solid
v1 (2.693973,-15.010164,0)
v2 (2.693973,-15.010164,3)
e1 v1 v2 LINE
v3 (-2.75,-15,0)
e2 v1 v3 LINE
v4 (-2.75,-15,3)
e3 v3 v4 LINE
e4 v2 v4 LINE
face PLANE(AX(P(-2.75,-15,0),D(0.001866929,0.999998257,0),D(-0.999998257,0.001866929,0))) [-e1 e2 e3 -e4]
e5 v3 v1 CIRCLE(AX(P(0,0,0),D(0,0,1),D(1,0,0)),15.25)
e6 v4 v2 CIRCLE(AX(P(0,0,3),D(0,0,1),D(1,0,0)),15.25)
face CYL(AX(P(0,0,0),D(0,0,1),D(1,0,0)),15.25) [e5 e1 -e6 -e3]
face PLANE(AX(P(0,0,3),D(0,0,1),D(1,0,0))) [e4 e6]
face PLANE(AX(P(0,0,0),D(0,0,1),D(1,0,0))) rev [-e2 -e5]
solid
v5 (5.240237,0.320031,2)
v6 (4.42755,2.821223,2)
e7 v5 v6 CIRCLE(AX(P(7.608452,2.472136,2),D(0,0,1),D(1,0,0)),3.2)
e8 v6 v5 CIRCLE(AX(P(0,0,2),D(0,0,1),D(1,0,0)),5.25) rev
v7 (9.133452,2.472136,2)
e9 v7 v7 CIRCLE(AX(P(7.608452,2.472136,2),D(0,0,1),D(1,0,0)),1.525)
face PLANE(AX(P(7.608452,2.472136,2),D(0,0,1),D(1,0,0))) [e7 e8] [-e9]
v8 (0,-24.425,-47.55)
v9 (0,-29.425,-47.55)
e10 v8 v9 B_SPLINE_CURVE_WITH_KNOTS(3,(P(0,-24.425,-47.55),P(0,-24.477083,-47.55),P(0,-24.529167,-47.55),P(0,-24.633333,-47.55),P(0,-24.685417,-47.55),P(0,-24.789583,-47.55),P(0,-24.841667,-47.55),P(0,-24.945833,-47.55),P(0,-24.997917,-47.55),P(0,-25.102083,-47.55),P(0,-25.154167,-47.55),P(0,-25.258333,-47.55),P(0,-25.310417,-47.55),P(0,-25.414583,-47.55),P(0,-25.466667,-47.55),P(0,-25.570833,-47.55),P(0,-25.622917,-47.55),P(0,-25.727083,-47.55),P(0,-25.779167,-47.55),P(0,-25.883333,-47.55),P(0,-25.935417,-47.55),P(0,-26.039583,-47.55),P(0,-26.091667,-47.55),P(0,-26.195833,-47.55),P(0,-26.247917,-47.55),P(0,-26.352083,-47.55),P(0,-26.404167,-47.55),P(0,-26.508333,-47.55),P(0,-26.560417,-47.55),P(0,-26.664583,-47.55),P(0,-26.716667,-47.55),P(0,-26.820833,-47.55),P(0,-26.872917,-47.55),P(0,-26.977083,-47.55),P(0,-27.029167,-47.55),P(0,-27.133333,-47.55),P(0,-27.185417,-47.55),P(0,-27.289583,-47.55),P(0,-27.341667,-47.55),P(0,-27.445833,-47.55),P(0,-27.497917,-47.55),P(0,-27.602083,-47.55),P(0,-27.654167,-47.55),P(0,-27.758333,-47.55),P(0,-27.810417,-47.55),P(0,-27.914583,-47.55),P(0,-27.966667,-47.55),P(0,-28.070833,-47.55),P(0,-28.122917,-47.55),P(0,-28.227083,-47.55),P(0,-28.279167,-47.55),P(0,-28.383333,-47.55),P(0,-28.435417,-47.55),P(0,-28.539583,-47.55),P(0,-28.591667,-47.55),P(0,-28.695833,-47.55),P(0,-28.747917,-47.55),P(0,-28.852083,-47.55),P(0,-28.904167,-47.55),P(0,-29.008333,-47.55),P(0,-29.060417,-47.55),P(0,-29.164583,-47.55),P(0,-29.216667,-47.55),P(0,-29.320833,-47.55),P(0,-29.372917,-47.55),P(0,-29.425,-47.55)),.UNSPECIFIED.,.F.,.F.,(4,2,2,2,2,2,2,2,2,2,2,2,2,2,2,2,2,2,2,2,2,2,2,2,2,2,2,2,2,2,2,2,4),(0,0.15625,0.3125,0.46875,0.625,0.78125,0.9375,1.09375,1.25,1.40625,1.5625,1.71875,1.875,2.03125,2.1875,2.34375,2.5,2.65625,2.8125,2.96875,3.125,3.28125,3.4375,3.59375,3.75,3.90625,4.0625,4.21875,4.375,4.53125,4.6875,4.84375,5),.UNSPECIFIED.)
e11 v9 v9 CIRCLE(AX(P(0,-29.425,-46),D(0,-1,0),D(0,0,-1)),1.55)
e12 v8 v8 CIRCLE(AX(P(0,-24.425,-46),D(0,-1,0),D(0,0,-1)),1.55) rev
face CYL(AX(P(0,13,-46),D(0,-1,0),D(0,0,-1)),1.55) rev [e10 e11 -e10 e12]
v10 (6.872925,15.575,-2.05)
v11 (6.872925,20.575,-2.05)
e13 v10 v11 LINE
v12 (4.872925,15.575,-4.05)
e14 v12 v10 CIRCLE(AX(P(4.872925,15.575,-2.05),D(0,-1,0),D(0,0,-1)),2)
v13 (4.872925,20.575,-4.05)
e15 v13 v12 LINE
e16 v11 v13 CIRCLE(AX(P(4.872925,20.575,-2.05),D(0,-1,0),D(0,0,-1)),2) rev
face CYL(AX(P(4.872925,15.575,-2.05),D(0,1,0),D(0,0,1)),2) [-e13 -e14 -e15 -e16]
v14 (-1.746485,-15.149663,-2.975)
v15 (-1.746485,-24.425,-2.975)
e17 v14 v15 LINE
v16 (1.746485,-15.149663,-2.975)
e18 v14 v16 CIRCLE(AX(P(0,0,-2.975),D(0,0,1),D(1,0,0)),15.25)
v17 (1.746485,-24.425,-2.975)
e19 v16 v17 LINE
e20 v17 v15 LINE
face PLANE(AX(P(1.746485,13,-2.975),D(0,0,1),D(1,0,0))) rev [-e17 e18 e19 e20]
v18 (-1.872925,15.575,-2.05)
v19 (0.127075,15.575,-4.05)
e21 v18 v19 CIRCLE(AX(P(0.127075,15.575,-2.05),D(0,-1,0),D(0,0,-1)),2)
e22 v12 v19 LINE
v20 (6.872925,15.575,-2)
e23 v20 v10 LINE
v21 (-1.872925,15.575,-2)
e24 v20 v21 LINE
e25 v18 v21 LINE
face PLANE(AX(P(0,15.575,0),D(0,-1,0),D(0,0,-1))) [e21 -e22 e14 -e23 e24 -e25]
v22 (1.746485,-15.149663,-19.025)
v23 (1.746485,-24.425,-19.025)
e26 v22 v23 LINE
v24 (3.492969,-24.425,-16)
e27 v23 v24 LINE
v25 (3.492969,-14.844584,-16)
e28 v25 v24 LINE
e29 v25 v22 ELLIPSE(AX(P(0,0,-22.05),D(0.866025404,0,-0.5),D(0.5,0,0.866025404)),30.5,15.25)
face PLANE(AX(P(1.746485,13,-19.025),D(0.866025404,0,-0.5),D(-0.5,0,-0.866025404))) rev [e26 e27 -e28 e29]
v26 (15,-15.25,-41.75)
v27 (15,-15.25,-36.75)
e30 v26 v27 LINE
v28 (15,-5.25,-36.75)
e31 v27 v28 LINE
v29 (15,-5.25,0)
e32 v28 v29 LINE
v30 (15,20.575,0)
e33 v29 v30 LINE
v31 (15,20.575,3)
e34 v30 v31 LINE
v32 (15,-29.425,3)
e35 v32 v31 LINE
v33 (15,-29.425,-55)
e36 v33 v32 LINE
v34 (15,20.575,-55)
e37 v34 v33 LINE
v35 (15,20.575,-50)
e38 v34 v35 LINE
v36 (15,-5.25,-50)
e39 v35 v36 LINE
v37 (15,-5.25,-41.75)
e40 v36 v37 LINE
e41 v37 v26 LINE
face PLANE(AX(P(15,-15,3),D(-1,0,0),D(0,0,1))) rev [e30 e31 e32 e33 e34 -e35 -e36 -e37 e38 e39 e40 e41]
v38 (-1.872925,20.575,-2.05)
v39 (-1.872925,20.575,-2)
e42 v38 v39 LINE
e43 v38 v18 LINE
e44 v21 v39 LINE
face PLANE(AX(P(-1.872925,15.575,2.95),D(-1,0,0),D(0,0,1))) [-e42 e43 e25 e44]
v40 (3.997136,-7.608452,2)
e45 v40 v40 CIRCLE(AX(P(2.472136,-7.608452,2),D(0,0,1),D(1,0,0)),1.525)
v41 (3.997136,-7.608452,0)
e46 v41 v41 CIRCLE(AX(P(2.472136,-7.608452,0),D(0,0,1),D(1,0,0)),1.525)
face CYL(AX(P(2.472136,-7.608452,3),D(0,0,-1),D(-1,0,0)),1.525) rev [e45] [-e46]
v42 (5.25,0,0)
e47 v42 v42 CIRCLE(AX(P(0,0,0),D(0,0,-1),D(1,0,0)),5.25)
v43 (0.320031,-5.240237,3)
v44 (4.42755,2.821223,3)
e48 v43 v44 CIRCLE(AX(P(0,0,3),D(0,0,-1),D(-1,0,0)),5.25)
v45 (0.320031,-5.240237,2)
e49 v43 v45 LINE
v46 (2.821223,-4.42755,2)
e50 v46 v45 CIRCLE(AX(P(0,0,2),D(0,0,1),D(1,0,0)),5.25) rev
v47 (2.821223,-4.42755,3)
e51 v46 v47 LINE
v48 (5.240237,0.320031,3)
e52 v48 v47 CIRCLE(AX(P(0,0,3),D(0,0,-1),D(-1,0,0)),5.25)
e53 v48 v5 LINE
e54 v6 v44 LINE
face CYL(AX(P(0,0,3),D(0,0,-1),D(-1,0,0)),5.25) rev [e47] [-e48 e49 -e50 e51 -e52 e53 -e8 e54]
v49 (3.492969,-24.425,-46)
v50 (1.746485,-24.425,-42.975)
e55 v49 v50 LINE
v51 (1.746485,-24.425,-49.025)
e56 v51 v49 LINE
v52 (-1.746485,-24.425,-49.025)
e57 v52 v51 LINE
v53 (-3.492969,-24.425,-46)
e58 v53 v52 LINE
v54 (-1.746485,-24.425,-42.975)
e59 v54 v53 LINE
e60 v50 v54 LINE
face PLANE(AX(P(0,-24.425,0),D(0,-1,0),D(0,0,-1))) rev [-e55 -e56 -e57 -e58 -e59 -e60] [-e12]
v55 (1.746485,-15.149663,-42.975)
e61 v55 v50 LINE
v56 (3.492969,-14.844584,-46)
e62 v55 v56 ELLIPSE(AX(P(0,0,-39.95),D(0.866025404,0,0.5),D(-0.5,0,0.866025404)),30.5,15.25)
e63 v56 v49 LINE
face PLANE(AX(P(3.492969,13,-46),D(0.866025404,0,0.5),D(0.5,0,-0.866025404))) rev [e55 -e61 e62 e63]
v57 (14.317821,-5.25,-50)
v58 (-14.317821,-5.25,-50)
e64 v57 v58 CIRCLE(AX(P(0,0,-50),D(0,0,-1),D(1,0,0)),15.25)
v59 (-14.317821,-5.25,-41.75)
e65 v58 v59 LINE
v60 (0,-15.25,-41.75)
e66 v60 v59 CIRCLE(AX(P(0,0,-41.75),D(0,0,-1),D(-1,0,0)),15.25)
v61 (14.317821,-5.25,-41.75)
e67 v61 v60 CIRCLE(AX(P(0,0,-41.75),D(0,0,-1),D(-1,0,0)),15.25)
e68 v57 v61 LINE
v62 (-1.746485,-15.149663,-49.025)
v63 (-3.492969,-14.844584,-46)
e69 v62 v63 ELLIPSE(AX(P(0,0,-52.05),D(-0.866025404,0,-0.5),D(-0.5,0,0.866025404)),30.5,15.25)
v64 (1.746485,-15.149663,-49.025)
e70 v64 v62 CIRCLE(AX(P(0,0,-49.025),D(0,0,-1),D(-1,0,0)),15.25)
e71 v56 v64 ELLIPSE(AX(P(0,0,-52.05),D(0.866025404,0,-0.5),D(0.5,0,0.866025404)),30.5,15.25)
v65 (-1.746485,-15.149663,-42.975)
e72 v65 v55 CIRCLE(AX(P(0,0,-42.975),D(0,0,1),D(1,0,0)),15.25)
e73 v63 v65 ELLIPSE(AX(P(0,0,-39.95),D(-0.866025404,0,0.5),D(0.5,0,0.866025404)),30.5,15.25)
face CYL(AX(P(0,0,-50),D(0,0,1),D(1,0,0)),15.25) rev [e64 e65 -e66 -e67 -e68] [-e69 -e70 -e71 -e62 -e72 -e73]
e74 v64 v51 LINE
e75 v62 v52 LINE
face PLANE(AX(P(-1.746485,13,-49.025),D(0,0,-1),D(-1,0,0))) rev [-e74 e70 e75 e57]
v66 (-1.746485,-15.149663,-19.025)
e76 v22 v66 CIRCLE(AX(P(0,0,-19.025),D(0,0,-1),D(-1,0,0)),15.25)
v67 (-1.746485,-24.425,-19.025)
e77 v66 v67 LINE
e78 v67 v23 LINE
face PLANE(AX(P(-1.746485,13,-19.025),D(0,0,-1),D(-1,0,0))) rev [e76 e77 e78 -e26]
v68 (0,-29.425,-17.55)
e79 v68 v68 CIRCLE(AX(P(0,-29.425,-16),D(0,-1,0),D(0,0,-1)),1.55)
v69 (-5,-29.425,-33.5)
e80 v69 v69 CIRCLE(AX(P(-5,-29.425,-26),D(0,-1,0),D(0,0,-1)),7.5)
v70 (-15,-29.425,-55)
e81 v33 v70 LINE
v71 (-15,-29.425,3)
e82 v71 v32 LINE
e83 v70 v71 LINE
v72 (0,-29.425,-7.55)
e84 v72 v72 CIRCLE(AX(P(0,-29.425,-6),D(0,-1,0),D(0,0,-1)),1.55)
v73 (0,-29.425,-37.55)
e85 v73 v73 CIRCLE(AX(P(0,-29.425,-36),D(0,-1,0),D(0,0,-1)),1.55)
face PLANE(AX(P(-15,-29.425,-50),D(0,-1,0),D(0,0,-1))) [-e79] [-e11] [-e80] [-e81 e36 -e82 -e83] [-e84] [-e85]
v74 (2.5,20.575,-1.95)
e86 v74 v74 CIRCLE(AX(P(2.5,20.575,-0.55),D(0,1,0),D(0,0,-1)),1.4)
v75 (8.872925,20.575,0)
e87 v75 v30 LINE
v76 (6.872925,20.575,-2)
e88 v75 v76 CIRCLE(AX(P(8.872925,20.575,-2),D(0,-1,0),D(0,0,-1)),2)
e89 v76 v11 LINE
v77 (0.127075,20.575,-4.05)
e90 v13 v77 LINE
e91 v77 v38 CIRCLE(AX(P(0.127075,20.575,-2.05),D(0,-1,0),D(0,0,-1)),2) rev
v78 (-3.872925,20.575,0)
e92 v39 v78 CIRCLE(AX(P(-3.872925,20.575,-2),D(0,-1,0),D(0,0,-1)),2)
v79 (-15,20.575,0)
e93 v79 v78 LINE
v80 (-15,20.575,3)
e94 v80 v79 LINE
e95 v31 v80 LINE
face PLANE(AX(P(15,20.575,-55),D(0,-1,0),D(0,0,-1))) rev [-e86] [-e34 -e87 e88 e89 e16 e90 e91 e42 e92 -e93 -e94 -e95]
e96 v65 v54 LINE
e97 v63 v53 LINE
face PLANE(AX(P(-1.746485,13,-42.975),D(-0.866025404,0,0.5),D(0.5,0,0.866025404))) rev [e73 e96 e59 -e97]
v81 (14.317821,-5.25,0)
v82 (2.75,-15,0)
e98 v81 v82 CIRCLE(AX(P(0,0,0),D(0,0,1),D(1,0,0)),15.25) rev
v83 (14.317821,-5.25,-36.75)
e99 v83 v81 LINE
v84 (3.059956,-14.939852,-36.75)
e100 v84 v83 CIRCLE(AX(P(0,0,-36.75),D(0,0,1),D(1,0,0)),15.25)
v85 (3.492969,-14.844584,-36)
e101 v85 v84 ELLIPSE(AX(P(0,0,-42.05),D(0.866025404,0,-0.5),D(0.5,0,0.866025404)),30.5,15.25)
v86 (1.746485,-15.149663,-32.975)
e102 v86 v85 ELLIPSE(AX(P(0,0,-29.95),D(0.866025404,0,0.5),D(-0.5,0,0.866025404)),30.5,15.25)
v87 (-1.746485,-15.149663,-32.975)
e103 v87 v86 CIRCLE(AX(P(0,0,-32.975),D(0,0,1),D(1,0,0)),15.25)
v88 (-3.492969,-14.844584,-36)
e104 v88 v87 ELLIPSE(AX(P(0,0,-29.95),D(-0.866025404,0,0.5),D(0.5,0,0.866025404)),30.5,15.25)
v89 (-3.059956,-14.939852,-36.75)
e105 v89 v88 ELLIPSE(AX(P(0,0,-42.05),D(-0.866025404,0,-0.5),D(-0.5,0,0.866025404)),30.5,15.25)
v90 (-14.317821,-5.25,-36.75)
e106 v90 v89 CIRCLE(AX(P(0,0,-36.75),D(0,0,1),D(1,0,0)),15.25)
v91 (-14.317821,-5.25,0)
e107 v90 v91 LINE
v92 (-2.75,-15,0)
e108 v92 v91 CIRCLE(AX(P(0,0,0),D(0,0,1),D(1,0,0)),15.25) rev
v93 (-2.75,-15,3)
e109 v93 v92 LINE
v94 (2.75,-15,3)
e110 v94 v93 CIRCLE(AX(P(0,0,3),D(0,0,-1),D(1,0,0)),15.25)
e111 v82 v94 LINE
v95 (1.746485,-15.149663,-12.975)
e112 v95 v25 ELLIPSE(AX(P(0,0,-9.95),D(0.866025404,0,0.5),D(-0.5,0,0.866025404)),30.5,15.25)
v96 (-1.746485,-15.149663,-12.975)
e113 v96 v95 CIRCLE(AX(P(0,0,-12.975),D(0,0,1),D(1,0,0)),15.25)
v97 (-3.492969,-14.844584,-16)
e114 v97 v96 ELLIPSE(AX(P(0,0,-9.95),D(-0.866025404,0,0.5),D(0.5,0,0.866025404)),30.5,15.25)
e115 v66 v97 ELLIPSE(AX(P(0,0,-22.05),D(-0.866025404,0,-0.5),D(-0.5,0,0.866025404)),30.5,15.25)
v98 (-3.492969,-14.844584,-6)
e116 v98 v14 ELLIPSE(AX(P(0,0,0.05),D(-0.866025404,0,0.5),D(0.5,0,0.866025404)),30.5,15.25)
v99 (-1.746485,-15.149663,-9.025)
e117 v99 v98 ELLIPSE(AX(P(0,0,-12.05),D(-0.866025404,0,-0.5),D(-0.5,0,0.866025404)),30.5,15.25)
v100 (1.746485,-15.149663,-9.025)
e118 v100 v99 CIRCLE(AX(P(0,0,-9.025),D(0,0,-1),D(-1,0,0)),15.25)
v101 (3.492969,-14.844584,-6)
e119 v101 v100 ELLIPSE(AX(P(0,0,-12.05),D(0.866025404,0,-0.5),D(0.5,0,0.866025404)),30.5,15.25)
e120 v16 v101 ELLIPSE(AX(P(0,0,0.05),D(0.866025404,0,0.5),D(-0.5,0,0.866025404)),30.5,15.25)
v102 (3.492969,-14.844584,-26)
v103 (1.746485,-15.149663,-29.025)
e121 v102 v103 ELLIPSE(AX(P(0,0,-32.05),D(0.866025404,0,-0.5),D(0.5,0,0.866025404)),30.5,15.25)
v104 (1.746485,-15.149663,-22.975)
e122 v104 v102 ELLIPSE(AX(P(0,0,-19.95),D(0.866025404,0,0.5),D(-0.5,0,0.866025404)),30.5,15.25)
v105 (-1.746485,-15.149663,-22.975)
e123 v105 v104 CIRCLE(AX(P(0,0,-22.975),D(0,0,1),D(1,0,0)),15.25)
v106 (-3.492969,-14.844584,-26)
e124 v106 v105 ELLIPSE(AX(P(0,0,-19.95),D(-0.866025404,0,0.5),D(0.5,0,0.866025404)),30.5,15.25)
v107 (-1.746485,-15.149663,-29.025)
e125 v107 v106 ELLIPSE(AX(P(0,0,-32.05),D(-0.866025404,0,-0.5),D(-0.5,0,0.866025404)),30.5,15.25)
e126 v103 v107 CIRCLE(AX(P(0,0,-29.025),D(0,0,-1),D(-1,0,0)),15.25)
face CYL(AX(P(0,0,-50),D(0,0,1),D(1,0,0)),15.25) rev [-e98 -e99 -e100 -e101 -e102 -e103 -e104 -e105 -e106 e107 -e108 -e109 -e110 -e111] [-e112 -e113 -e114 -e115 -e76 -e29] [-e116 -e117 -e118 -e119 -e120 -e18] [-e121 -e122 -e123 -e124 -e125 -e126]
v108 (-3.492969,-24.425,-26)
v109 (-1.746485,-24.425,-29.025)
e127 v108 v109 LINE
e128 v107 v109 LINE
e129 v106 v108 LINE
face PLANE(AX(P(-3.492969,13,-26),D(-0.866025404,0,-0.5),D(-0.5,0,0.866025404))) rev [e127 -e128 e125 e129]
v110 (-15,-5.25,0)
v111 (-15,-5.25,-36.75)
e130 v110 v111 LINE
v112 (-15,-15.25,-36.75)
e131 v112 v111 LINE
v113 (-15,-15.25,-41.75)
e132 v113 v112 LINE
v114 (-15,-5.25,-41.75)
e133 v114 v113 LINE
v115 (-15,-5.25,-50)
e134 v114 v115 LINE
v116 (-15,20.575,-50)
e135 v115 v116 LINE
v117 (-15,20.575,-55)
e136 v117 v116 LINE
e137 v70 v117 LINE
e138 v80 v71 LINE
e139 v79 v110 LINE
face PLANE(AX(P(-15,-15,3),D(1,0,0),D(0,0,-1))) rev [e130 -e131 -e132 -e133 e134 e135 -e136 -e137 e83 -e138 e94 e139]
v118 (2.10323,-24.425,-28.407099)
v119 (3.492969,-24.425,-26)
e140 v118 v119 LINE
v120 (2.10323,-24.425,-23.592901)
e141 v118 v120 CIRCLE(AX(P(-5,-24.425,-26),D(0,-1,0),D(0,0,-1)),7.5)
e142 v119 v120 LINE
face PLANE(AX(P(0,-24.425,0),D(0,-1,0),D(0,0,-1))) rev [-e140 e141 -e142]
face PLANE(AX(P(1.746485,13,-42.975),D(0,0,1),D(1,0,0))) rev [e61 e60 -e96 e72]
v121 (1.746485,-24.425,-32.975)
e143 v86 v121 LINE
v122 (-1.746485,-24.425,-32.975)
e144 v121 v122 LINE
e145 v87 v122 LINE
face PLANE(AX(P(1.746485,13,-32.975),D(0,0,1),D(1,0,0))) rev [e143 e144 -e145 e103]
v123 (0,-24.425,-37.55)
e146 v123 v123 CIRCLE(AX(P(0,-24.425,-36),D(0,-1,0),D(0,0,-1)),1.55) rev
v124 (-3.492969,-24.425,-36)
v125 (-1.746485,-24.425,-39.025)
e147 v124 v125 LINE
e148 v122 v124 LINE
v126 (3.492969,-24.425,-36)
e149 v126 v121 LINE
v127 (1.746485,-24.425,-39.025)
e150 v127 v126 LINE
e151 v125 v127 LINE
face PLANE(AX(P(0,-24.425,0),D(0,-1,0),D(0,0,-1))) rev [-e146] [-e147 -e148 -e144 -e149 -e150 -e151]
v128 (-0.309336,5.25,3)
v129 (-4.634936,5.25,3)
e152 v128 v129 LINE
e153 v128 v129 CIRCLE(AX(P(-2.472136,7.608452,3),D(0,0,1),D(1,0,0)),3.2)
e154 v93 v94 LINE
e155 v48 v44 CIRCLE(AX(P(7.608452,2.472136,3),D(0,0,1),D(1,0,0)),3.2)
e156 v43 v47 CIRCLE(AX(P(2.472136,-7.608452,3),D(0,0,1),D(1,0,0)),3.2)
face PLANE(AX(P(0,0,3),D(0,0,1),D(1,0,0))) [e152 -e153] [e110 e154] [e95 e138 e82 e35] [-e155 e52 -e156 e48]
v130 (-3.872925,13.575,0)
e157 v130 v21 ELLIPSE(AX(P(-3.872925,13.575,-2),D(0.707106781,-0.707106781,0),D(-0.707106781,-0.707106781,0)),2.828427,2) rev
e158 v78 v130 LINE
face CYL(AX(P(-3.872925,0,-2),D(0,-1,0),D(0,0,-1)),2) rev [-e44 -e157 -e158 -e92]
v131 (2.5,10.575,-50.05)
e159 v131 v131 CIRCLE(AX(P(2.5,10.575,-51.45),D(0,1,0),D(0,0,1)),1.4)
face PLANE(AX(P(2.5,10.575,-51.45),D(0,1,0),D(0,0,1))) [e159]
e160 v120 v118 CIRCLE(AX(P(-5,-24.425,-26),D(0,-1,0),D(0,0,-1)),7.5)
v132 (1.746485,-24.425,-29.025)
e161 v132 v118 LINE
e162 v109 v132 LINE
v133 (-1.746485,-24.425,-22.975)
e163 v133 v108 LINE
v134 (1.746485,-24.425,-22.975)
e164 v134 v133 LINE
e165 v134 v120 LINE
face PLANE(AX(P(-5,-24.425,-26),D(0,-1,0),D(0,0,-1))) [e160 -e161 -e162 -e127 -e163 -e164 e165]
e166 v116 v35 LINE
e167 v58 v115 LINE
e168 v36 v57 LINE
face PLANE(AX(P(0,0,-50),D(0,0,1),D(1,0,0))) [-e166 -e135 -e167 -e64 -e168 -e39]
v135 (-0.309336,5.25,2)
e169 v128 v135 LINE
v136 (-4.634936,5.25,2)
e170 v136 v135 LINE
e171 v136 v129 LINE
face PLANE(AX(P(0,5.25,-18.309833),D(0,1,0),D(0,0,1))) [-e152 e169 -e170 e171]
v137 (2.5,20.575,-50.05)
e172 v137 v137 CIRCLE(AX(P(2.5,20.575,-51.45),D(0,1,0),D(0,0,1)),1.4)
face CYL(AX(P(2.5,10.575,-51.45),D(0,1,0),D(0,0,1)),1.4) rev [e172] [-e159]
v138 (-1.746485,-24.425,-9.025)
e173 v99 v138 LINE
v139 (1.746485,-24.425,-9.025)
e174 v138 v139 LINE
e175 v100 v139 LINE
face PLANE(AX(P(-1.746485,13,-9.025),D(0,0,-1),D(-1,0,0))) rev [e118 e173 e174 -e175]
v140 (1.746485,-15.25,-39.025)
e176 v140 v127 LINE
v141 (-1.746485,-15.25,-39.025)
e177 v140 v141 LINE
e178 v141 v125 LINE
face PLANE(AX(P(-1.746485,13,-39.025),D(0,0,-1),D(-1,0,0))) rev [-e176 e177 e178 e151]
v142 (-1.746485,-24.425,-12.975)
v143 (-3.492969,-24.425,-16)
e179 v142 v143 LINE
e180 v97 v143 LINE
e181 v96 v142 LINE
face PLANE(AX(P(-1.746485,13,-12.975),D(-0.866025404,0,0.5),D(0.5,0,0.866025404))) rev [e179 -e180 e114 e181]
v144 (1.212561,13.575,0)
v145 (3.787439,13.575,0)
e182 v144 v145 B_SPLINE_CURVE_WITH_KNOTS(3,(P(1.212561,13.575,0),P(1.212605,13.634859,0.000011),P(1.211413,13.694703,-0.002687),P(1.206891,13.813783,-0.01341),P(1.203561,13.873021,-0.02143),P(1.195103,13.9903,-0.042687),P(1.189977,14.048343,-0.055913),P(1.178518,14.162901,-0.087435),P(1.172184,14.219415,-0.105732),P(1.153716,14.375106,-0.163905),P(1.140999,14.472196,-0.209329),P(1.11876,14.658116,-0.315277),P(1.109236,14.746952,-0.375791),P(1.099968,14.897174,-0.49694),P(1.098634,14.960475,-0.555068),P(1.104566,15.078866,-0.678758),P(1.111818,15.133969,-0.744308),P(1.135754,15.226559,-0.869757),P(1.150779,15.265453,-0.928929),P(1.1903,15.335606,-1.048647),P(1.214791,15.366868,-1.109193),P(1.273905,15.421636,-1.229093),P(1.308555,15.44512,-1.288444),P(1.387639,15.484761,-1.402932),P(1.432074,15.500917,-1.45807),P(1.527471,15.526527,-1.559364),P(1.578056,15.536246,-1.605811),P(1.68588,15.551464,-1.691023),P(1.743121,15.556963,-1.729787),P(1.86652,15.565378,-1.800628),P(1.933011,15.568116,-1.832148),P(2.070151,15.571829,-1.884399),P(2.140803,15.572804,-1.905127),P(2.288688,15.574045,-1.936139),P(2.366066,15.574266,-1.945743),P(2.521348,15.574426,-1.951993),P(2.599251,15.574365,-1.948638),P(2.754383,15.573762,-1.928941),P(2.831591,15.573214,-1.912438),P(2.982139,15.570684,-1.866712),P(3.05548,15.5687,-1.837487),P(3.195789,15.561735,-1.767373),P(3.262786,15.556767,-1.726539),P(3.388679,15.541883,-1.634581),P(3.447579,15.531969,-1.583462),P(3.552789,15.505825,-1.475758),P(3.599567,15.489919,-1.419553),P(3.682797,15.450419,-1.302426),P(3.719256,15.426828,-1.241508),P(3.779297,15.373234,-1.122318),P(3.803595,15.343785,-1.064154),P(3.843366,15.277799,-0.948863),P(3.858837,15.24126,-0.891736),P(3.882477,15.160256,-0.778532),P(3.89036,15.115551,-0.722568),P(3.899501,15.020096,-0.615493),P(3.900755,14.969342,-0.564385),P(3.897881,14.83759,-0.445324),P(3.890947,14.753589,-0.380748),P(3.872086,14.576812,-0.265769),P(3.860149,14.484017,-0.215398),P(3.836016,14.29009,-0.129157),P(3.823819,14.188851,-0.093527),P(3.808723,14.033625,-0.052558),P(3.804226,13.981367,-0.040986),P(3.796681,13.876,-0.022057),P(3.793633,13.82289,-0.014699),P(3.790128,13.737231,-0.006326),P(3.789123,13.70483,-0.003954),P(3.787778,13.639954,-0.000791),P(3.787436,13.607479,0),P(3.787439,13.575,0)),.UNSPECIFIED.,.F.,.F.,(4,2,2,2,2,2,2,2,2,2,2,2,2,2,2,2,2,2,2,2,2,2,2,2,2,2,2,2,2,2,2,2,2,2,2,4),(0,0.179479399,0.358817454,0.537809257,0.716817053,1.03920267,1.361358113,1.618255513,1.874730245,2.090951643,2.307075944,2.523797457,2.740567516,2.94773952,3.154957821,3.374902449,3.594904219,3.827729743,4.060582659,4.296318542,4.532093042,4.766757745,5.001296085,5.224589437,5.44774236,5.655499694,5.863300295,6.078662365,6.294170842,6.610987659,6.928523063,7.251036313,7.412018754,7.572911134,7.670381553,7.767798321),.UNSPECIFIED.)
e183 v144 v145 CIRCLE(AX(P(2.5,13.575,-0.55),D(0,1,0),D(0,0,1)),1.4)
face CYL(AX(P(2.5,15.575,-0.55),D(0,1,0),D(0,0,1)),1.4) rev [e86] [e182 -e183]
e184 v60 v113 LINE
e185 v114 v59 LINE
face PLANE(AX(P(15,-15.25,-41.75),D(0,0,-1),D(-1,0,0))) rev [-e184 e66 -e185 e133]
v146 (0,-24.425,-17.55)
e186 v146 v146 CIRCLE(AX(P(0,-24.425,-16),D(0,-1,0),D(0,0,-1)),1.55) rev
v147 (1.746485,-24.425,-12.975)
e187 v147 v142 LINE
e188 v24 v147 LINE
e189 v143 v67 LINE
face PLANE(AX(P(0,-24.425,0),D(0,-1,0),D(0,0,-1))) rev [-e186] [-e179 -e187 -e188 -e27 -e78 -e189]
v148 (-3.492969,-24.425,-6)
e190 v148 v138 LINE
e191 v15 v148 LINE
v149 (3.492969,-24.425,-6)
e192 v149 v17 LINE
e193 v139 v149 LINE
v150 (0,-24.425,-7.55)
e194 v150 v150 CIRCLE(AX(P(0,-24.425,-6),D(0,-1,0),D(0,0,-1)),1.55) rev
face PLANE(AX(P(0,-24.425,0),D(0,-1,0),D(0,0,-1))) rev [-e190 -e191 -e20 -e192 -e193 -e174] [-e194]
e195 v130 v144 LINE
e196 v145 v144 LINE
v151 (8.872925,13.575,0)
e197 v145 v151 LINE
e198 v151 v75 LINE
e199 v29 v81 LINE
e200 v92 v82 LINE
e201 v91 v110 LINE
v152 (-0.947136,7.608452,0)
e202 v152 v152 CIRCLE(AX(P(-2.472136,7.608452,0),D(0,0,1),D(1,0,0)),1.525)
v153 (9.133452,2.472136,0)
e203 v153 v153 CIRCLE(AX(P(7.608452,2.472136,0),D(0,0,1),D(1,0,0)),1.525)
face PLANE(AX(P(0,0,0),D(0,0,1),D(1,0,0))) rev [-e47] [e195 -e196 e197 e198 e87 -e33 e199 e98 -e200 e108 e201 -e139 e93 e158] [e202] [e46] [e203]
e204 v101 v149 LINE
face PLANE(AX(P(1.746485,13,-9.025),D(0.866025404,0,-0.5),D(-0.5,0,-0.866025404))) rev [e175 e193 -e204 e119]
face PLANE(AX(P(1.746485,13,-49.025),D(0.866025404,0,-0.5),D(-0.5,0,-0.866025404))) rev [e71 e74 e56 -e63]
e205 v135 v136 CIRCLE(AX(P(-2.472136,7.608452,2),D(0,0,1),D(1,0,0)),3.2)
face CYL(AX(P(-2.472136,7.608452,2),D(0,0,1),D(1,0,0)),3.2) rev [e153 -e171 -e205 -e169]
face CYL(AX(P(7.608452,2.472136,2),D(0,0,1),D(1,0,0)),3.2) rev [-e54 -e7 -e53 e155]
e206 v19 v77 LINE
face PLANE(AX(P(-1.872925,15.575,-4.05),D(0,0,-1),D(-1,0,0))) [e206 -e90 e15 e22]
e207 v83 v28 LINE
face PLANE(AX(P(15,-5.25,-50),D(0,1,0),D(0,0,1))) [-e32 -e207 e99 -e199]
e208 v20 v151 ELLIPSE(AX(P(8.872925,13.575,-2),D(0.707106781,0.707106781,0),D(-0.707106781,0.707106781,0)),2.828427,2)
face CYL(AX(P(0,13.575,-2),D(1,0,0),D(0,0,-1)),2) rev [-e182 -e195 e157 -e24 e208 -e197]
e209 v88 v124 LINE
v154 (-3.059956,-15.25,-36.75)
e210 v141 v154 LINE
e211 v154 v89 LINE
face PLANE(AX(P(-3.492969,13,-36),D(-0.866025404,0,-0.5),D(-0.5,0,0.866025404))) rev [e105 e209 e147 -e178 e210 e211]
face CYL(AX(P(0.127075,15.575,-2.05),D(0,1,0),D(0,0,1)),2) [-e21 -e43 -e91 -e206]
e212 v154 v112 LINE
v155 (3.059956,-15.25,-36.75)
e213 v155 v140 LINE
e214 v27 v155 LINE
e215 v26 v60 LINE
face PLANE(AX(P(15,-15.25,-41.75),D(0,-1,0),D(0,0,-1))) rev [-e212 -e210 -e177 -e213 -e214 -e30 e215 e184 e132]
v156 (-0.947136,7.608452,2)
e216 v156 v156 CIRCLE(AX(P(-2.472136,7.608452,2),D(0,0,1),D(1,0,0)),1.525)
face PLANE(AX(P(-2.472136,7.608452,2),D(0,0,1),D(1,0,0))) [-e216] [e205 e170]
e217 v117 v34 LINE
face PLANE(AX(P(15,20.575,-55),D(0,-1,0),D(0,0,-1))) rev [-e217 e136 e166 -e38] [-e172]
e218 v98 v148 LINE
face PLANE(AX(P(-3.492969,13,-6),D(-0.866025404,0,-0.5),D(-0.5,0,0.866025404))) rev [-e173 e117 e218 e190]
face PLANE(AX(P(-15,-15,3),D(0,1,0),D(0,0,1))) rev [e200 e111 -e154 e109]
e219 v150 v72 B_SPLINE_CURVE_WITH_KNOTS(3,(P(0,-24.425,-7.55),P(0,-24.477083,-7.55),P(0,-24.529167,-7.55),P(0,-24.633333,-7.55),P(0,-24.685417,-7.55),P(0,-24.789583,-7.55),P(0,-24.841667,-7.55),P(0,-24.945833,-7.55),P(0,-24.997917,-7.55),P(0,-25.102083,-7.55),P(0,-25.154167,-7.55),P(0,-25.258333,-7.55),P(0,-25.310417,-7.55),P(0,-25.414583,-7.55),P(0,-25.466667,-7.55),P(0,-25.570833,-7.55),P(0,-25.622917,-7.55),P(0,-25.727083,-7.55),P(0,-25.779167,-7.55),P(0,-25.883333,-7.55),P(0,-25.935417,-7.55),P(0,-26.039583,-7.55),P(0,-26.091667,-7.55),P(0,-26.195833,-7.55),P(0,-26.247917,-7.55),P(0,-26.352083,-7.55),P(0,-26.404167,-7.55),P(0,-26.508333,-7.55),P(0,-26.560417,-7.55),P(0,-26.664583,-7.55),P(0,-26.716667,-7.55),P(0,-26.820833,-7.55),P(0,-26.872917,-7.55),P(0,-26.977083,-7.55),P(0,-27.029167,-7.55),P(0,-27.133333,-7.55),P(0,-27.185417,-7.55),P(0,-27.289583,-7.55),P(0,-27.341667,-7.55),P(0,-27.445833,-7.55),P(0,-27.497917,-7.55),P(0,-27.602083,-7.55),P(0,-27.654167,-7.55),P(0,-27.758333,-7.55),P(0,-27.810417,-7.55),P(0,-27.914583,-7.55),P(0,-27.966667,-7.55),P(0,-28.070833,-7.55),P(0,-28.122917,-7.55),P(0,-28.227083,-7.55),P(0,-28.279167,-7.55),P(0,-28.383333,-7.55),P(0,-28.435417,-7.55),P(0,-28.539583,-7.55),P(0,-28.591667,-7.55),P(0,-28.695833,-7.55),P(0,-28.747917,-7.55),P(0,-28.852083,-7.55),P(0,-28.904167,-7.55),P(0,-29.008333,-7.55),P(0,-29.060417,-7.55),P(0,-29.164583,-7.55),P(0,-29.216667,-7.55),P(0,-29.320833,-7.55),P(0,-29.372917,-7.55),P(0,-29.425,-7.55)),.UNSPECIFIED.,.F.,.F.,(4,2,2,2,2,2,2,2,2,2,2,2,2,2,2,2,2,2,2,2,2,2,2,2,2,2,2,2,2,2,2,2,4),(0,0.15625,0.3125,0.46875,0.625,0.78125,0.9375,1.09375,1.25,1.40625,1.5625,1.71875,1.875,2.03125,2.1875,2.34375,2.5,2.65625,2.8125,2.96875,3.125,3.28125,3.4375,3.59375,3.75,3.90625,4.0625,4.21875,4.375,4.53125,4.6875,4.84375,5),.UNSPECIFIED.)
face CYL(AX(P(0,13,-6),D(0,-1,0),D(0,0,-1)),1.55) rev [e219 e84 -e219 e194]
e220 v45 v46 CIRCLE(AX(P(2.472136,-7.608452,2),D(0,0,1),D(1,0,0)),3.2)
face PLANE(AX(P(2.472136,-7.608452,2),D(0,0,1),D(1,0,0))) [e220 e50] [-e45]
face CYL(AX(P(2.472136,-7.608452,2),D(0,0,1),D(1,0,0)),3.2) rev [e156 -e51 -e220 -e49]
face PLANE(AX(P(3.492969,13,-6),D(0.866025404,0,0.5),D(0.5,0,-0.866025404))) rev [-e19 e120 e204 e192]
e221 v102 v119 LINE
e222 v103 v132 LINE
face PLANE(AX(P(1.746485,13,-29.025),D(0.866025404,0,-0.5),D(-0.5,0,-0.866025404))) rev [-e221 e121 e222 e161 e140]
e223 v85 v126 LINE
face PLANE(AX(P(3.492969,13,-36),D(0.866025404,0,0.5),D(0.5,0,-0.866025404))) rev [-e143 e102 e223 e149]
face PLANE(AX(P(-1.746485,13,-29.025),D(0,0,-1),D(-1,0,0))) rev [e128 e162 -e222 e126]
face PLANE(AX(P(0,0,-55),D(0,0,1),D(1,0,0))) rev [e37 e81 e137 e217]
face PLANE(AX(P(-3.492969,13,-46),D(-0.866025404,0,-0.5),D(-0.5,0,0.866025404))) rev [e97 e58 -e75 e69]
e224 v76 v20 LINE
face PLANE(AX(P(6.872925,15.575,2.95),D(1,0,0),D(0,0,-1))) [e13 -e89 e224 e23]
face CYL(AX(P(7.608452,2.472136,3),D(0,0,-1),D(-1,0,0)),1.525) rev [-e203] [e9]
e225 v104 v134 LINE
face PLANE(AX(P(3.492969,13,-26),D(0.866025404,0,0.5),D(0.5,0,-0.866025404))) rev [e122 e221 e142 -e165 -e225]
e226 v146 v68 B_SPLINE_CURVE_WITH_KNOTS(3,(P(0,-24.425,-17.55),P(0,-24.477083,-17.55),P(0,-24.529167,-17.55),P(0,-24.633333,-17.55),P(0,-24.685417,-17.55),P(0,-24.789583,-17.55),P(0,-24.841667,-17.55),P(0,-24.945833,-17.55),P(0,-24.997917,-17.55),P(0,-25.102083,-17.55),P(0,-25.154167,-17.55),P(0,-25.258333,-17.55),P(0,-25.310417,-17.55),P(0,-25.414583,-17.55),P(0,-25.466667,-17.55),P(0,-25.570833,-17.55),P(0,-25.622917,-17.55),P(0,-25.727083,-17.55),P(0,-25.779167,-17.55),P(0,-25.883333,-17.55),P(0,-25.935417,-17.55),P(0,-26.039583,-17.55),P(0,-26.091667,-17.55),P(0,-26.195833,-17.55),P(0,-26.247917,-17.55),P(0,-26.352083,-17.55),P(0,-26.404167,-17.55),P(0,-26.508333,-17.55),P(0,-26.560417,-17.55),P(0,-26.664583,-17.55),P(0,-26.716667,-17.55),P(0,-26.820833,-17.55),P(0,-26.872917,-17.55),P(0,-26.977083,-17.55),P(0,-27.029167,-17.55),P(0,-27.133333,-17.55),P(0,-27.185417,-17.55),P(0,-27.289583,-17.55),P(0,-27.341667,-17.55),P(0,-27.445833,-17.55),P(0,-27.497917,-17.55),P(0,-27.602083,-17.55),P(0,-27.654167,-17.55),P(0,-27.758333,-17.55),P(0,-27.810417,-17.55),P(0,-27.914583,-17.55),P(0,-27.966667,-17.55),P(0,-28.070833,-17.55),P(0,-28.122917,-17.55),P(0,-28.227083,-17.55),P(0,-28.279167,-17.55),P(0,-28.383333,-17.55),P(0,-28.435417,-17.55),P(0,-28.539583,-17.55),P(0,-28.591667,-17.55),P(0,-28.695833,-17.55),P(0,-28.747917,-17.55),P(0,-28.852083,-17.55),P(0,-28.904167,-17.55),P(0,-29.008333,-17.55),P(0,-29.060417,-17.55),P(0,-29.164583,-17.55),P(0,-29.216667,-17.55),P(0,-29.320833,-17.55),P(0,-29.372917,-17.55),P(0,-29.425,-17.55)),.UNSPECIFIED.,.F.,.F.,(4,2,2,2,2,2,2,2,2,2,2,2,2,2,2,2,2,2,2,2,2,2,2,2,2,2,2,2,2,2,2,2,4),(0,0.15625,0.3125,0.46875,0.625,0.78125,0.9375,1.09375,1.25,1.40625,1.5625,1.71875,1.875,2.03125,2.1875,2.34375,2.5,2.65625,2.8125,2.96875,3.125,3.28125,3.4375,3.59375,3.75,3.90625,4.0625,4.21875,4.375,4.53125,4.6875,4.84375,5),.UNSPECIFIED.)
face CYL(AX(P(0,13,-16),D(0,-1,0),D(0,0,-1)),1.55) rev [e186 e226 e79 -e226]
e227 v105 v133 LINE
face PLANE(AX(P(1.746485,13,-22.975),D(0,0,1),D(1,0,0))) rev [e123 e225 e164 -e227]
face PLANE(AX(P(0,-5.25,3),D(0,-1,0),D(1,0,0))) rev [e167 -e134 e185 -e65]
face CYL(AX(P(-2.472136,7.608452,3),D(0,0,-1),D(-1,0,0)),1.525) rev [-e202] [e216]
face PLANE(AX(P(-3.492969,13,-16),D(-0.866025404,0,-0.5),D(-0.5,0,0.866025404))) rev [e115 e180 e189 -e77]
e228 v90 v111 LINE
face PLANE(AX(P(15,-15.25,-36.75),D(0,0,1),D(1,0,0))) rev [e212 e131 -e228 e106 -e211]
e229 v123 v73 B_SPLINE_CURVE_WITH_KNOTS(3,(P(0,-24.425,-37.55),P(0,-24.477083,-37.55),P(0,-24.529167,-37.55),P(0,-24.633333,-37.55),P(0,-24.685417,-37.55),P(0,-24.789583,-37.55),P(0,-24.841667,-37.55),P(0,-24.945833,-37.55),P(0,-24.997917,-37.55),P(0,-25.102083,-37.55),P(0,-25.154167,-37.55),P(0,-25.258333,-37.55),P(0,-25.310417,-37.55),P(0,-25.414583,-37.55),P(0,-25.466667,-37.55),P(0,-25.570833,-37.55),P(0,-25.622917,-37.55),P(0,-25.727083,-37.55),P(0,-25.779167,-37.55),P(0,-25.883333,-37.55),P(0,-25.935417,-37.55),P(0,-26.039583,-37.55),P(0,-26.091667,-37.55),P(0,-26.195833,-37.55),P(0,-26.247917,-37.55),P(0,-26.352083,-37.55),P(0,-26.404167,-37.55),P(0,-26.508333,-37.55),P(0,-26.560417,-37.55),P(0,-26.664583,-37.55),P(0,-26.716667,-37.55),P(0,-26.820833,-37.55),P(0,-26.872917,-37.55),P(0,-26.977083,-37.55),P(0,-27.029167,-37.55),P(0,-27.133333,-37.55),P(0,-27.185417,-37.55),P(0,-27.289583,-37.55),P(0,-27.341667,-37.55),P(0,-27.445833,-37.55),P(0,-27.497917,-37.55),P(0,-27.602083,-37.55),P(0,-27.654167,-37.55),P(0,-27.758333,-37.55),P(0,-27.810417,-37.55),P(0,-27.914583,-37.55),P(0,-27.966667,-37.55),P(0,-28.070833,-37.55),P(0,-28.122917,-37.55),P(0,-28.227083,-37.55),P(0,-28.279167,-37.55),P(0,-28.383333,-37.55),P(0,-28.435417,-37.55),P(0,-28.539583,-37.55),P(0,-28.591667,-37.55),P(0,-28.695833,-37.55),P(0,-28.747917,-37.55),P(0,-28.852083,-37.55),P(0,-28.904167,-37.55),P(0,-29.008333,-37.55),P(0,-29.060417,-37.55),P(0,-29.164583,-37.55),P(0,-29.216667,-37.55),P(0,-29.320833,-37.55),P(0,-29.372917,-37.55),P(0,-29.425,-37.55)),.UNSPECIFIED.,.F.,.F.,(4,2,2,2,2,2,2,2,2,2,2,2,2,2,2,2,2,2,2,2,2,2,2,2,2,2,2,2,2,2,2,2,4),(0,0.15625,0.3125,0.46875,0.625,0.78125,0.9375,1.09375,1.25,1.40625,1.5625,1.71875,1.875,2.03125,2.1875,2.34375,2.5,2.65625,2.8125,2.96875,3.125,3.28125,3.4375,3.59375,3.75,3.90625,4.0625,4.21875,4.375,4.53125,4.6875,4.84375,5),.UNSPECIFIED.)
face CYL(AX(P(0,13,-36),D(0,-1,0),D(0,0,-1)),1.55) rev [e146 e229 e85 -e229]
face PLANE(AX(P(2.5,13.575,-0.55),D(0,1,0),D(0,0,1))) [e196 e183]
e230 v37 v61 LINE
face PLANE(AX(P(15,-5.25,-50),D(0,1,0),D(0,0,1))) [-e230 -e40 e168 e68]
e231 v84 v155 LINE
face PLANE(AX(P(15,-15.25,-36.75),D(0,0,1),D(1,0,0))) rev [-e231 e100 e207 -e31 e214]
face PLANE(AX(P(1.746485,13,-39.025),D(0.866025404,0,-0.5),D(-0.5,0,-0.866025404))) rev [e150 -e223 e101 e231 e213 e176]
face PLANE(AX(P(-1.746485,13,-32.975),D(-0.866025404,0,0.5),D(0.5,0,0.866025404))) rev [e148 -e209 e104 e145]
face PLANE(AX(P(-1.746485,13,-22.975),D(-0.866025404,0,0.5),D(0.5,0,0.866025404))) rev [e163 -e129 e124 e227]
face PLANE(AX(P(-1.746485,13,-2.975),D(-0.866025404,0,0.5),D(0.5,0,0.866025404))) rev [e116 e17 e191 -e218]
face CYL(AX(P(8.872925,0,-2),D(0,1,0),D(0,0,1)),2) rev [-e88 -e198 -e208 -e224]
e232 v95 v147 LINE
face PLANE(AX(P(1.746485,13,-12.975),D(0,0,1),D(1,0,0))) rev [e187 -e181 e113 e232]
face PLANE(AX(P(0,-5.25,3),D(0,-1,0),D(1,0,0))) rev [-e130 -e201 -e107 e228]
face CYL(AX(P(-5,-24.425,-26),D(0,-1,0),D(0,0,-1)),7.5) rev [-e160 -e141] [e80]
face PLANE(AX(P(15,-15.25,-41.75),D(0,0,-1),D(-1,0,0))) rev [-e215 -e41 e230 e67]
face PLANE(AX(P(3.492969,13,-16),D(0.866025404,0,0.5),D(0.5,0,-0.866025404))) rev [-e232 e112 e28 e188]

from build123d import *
from build123d.topology import SkipClean

# Parameters (mm, degrees)
SKETCH1_R           = 1.525
BOSS_EXTRUDE1_DEPTH = 3
BOSS_EXTRUDE2_DEPTH = 53
SKETCH3_R           = 1.55
CUT_EXTRUDE1_DEPTH  = 68.267232922
BOSS_EXTRUDE3_DEPTH = 3
CUT_EXTRUDE2_START  = -5
SKETCH5_R           = 1.55
CUT_EXTRUDE2_DEPTH  = 63.267232996
SKETCH6_R           = 3.2
CUT_EXTRUDE3_DEPTH  = 1
SKETCH7_W           = 30
SKETCH7_H           = 50
BOSS_EXTRUDE4_DEPTH = 5
SKETCH9_W           = 5
SKETCH9_H           = 20
CUT_EXTRUDE6_DEPTH  = 70.215826406
SKETCH10_R          = 7.5
CUT_EXTRUDE7_DEPTH  = 5
SKETCH12_R          = 1.4
CUT_EXTRUDE8_DEPTH  = 10
SKETCH13_W          = 30
SKETCH13_H          = 3
BOSS_EXTRUDE5_DEPTH = 7.575
BOSS_EXTRUDE6_START = -3
BOSS_EXTRUDE6_DEPTH = 3
SKETCH15_W          = 8.745849688
SKETCH15_H          = 7
SKETCH15_R          = 1.4
BOSS_EXTRUDE7_DEPTH = 5
SKETCH16_R          = 1.4
CUT_EXTRUDE9_DEPTH  = 7
FILLET1_R           = 2


with BuildPart() as part:
    # Sketch1 → Boss-Extrude1 (new body)
    with BuildSketch(Plane.XY):
        with BuildLine():
            Line((-15, -15), (15, -15))
            Line((15, -15), (15, 13))
            Line((15, 13), (-15, 13))
            Line((-15, 13), (-15, 5.25))
            Line((-15, 5.25), (0, 5.25))
            ThreePointArc((0, 5.25), (3.712310601, 3.712310601), (5.25, 0))
            ThreePointArc((5.25, 0), (3.712310601, -3.712310601), (0, -5.25))
            Line((0, -5.25), (-15, -5.25))
            Line((-15, -5.25), (-15, -15))
        make_face()
        with Locations((-2.472135955, 7.60845213)):
            Circle(SKETCH1_R, mode=Mode.SUBTRACT)
        with Locations((7.60845213, 2.472135955)):
            Circle(SKETCH1_R, mode=Mode.SUBTRACT)
        with Locations((2.472135955, -7.60845213)):
            Circle(SKETCH1_R, mode=Mode.SUBTRACT)
    extrude(amount=BOSS_EXTRUDE1_DEPTH)

    # Sketch2 → Boss-Extrude2 (add)
    with BuildSketch(Plane.XY.offset(3)):
        with BuildLine():
            Line((-15, -15), (-15, -5.25))
            Line((-15, -5.25), (-14.317821063, -5.25))
            ThreePointArc((-14.317821063, -5.25), (0, -15.25), (14.317821063, -5.25))
            Line((14.317821063, -5.25), (15, -5.25))
            Line((15, -5.25), (15, -15))
            Line((15, -15), (15, -29.425))
            Line((15, -29.425), (-15, -29.425))
            Line((-15, -29.425), (-15, -15))
        make_face()
    extrude(amount=-BOSS_EXTRUDE2_DEPTH)

    # Sketch3 → Cut-Extrude1 (cut, through all)
    with BuildSketch(Plane(origin=(0, -29.425, 0), x_dir=(-1, 0, 0), z_dir=(0, -1, 0))):
        with Locations(Location((0, 46, 0), (0, 0, 90))):
            Circle(SKETCH3_R)
        with Locations(Location((0, 36, 0), (0, 0, 90))):
            Circle(SKETCH3_R)
        with Locations(Location((0, 26, 0), (0, 0, 90))):
            Circle(SKETCH3_R)
        with Locations(Location((0, 16, 0), (0, 0, 90))):
            Circle(SKETCH3_R)
        with Locations(Location((0, 6, 0), (0, 0, 90))):
            Circle(SKETCH3_R)
    extrude(amount=-CUT_EXTRUDE1_DEPTH, mode=Mode.SUBTRACT)

    # Sketch5 → Cut-Extrude2 (cut, through all)
    # profile 1 of 5: a face of its own
    with BuildSketch(Plane(origin=(0, -29.425, 0), x_dir=(-1, 0, 0), z_dir=(0, -1, 0)).offset(CUT_EXTRUDE2_START)):
        Polygon((1.746484564, 32.975), (3.492969129, 36), (1.746484564, 39.025), (-1.746484564, 39.025), (-3.492969129, 36), (-1.746484564, 32.975), align=None)
        with Locations(Location((0, 36, 0), (0, 0, 90))):
            Circle(SKETCH5_R, mode=Mode.SUBTRACT)
    # profile 2 of 5: a face of its own
    with BuildSketch(Plane(origin=(0, -29.425, 0), x_dir=(-1, 0, 0), z_dir=(0, -1, 0)).offset(CUT_EXTRUDE2_START)):
        Polygon((1.746484564, 42.975), (3.492969129, 46), (1.746484564, 49.025), (-1.746484564, 49.025), (-3.492969129, 46), (-1.746484564, 42.975), align=None)
        with Locations(Location((0, 46, 0), (0, 0, 90))):
            Circle(SKETCH5_R, mode=Mode.SUBTRACT)
    # profile 3 of 5: a face of its own
    with BuildSketch(Plane(origin=(0, -29.425, 0), x_dir=(-1, 0, 0), z_dir=(0, -1, 0)).offset(CUT_EXTRUDE2_START)):
        Polygon((1.746484564, 22.975), (3.492969129, 26), (1.746484564, 29.025), (-1.746484564, 29.025), (-3.492969129, 26), (-1.746484564, 22.975), align=None)
        with Locations(Location((0, 26, 0), (0, 0, 90))):
            Circle(SKETCH5_R, mode=Mode.SUBTRACT)
    # profile 4 of 5: a face of its own
    with BuildSketch(Plane(origin=(0, -29.425, 0), x_dir=(-1, 0, 0), z_dir=(0, -1, 0)).offset(CUT_EXTRUDE2_START)):
        Polygon((1.746484564, 12.975), (3.492969129, 16), (1.746484564, 19.025), (-1.746484564, 19.025), (-3.492969129, 16), (-1.746484564, 12.975), align=None)
        with Locations(Location((0, 16, 0), (0, 0, 90))):
            Circle(SKETCH5_R, mode=Mode.SUBTRACT)
    # profile 5 of 5: a face of its own
    with BuildSketch(Plane(origin=(0, -29.425, 0), x_dir=(-1, 0, 0), z_dir=(0, -1, 0)).offset(CUT_EXTRUDE2_START)):
        Polygon((1.746484564, 2.975), (3.492969129, 6), (1.746484564, 9.025), (-1.746484564, 9.025), (-3.492969129, 6), (-1.746484564, 2.975), align=None)
        with Locations(Location((0, 6, 0), (0, 0, 90))):
            Circle(SKETCH5_R, mode=Mode.SUBTRACT)
    extrude(amount=-CUT_EXTRUDE2_DEPTH, mode=Mode.SUBTRACT)

    # Sketch6 → Cut-Extrude3 (cut)
    with BuildSketch(Plane.XY.offset(3)):
        with Locations((2.472135955, -7.60845213)):
            Circle(SKETCH6_R)
        with Locations((-2.472135955, 7.60845213)):
            Circle(SKETCH6_R)
        with Locations((7.60845213, 2.472135955)):
            Circle(SKETCH6_R)
    extrude(amount=-CUT_EXTRUDE3_DEPTH, mode=Mode.SUBTRACT)

    # Sketch7 → Boss-Extrude4 (add)
    with BuildSketch(Plane(origin=(0, 0, -50), x_dir=(-1, 0, 0), z_dir=(0, 0, -1))):
        with Locations((0, -4.425)):
            Rectangle(SKETCH7_W, SKETCH7_H)
    extrude(amount=BOSS_EXTRUDE4_DEPTH)

    # Sketch9 → Cut-Extrude6 (cut, through all)
    with BuildSketch(Plane.ZY.offset(15)):
        with Locations((-39.25, -5.25)):
            Rectangle(SKETCH9_W, SKETCH9_H)
    extrude(amount=-CUT_EXTRUDE6_DEPTH, mode=Mode.SUBTRACT)

    # Sketch10 → Cut-Extrude7 (cut)
    with BuildSketch(Plane(origin=(0, -29.425, 0), x_dir=(-1, 0, 0), z_dir=(0, -1, 0))):
        with Locations(Location((5, 26, 0), (0, 0, 90))):
            Circle(SKETCH10_R)
    extrude(amount=-CUT_EXTRUDE7_DEPTH, mode=Mode.SUBTRACT)

    # Sketch12 → Cut-Extrude8 (cut)
    with BuildSketch(Plane(origin=(0, 20.575, 0), x_dir=(1, 0, 0), z_dir=(0, 1, 0))):
        with Locations(Location((2.5, 51.45, 0), (0, 0, 270))):
            Circle(SKETCH12_R)
    extrude(amount=-CUT_EXTRUDE8_DEPTH, mode=Mode.SUBTRACT)

    # Sketch13 → Boss-Extrude5 (add)
    with BuildSketch(Plane(origin=(0, 13, 0), x_dir=(1, 0, 0), z_dir=(0, 1, 0))):
        with Locations((0, -1.5)):
            Rectangle(SKETCH13_W, SKETCH13_H)
    extrude(amount=BOSS_EXTRUDE5_DEPTH)

    # Sketch14 → Boss-Extrude6 (add)
    with BuildSketch(Plane.XY.offset(3).offset(BOSS_EXTRUDE6_START)):
        with BuildLine():
            Line((0, 5.25), (-15, 5.25))
            Line((-15, 5.25), (-15, -5.25))
            Line((-15, -5.25), (0, -5.25))
            ThreePointArc((0, -5.25), (-5.25, 0), (0, 5.25))
        make_face()
    extrude(amount=BOSS_EXTRUDE6_DEPTH)

    # Sketch15 → Boss-Extrude7 (add)
    with BuildSketch(Plane(origin=(0, 20.575, 0), x_dir=(1, 0, 0), z_dir=(0, 1, 0))):
        with Locations((2.5, 0.55)):
            Rectangle(SKETCH15_W, SKETCH15_H)
        with Locations((2.5, 0.55)):
            Circle(SKETCH15_R, mode=Mode.SUBTRACT)
    extrude(amount=-BOSS_EXTRUDE7_DEPTH)

    # Sketch16 → Cut-Extrude9 (cut)
    with SkipClean():  # the faces are left unmerged after this step: merging them gives an invalid solid
        with BuildSketch(Plane(origin=(0, 20.575, 0), x_dir=(1, 0, 0), z_dir=(0, 1, 0))):
            with Locations(Location((2.5, 0.55, 0), (0, 0, 203.132396399))):
                Circle(SKETCH16_R)
        extrude(amount=-CUT_EXTRUDE9_DEPTH, mode=Mode.SUBTRACT)
    add(part.part.scale(1), mode=Mode.REPLACE)  # the faces are merged on a copy

    # Fillet1
    # the kernel refuses this fillet: 2 mm, written as the material it adds along each edge
    with BuildSketch(Plane(origin=(6.212560681, 15.575, 0), x_dir=(0, -1, 0), z_dir=(-1, 0, 0))) as fillet1_piece_1_section:
        with BuildLine():
            CenterArc((FILLET1_R, -FILLET1_R), FILLET1_R, 90, 90)
            Line((0, -FILLET1_R), (0, 0))
            Line((0, 0), (FILLET1_R, 0))
        make_face()
    fillet1_piece_1 = extrude(amount=8.085485525, mode=Mode.PRIVATE)
    fillet1_piece_1 = fillet1_piece_1 - Plane(origin=(2.5, 15.575, -0.55), x_dir=(1, 0, 0), z_dir=(0, 1, 0)) * Cylinder(1.4, 25, mode=Mode.PRIVATE)
    add(fillet1_piece_1)
    with BuildSketch(Plane(origin=(6.872924844, 15.575, 0), x_dir=(0, -1, 0), z_dir=(-1, 0, 0))) as fillet1_piece_2_section:
        with BuildLine():
            CenterArc((FILLET1_R, -FILLET1_R), FILLET1_R, 90, 90)
            Line((0, -FILLET1_R), (0, 0))
            Line((0, 0), (FILLET1_R, 0))
        make_face()
    fillet1_piece_2 = extrude(amount=8.085485525, mode=Mode.PRIVATE)
    fillet1_piece_2 = fillet1_piece_2 - Plane(origin=(2.5, 15.575, -0.55), x_dir=(1, 0, 0), z_dir=(0, 1, 0)) * Cylinder(1.4, 25, mode=Mode.PRIVATE)
    add(fillet1_piece_2)
    with BuildSketch(Plane(origin=(6.872924844, 15.575, 0), x_dir=(1, 0, 0), z_dir=(0, 1, 0)), Plane(origin=(-1.872924844, 20.575, 0), x_dir=(-1, 0, 0), z_dir=(0, -1, 0))) as fillet1_piece_3:
        with BuildLine():
            CenterArc((FILLET1_R, FILLET1_R), FILLET1_R, 180, 90)
            Line((0, FILLET1_R), (0, 0))
            Line((0, 0), (FILLET1_R, 0))
        make_face()
    extrude(amount=5)
    with BuildSketch(Plane(origin=(-1.872924844, 20.575, 0), x_dir=(-1, 0, 0), z_dir=(0, -1, 0))) as fillet1_piece_4a_section:
        with BuildLine():
            CenterArc((FILLET1_R, FILLET1_R), FILLET1_R, 180, 90)
            Line((0, FILLET1_R), (0, 0))
            Line((0, 0), (FILLET1_R, 0))
        make_face()
    fillet1_piece_4a = extrude(amount=10, mode=Mode.PRIVATE)
    fillet1_piece_4a = split(fillet1_piece_4a, bisect_by=Plane(origin=(-1.872924844, 15.575, 0), z_dir=(0, -1, 0)), keep=Keep.TOP, mode=Mode.PRIVATE)
    with BuildSketch(Plane(origin=(6.212560681, 15.575, 0), x_dir=(0, -1, 0), z_dir=(-1, 0, 0))) as fillet1_piece_4b_section:
        with BuildLine():
            CenterArc((FILLET1_R, -FILLET1_R), FILLET1_R, 90, 90)
            Line((0, -FILLET1_R), (0, 0))
            Line((0, 0), (FILLET1_R, 0))
        make_face()
    fillet1_piece_4b = extrude(amount=13.085485525, mode=Mode.PRIVATE)
    fillet1_piece_4b = split(fillet1_piece_4b, bisect_by=Plane(origin=(-1.872924844, 15.575, 0), z_dir=(-1, 0, 0)), keep=Keep.TOP, mode=Mode.PRIVATE)
    fillet1_piece_4 = fillet1_piece_4a & fillet1_piece_4b
    add(fillet1_piece_4)
    with BuildSketch(Plane(origin=(11.872924844, 15.575, 0), x_dir=(0, -1, 0), z_dir=(-1, 0, 0))) as fillet1_piece_5a_section:
        with BuildLine():
            CenterArc((FILLET1_R, -FILLET1_R), FILLET1_R, 90, 90)
            Line((0, -FILLET1_R), (0, 0))
            Line((0, 0), (FILLET1_R, 0))
        make_face()
    fillet1_piece_5a = extrude(amount=13.085485525, mode=Mode.PRIVATE)
    fillet1_piece_5a = split(fillet1_piece_5a, bisect_by=Plane(origin=(6.872924844, 15.575, 0), z_dir=(1, 0, 0)), keep=Keep.TOP, mode=Mode.PRIVATE)
    with BuildSketch(Plane(origin=(6.872924844, 10.575, 0), x_dir=(1, 0, 0), z_dir=(0, 1, 0))) as fillet1_piece_5b_section:
        with BuildLine():
            CenterArc((FILLET1_R, FILLET1_R), FILLET1_R, 180, 90)
            Line((0, FILLET1_R), (0, 0))
            Line((0, 0), (FILLET1_R, 0))
        make_face()
    fillet1_piece_5b = extrude(amount=10, mode=Mode.PRIVATE)
    fillet1_piece_5b = split(fillet1_piece_5b, bisect_by=Plane(origin=(6.872924844, 15.575, 0), z_dir=(0, -1, 0)), keep=Keep.TOP, mode=Mode.PRIVATE)
    fillet1_piece_5 = fillet1_piece_5a & fillet1_piece_5b
    add(fillet1_piece_5)
    # the kernel refuses this fillet: 2 mm, written as the material it takes off along each edge
    with BuildSketch(Plane(origin=(6.872924844, 25.575, -4.05), x_dir=(-1, 0, 0), z_dir=(0, -1, 0)), Plane(origin=(-1.872924844, 25.575, -4.05), x_dir=(0, 0, 1), z_dir=(0, -1, 0))) as fillet1_2_piece_1:
        with BuildLine():
            CenterArc((FILLET1_R, -FILLET1_R), FILLET1_R, 90, 90)
            Line((0, -FILLET1_R), (0, 0))
            Line((0, 0), (FILLET1_R, 0))
        make_face()
    extrude(amount=15, mode=Mode.SUBTRACT)


with BuildPart() as body_2:
    # Sketch4 → Boss-Extrude3 (new body)
    with BuildSketch(Plane.XY.offset(3)):
        with BuildLine():
            Line((-2.75, -15), (2.693973064, -15.010163528))
            ThreePointArc((2.693973064, -15.010163528), (-0.028470664, -15.249973424), (-2.75, -15))
        make_face()
    extrude(amount=-BOSS_EXTRUDE3_DEPTH)


solid = Compound([part.part, body_2.part])
